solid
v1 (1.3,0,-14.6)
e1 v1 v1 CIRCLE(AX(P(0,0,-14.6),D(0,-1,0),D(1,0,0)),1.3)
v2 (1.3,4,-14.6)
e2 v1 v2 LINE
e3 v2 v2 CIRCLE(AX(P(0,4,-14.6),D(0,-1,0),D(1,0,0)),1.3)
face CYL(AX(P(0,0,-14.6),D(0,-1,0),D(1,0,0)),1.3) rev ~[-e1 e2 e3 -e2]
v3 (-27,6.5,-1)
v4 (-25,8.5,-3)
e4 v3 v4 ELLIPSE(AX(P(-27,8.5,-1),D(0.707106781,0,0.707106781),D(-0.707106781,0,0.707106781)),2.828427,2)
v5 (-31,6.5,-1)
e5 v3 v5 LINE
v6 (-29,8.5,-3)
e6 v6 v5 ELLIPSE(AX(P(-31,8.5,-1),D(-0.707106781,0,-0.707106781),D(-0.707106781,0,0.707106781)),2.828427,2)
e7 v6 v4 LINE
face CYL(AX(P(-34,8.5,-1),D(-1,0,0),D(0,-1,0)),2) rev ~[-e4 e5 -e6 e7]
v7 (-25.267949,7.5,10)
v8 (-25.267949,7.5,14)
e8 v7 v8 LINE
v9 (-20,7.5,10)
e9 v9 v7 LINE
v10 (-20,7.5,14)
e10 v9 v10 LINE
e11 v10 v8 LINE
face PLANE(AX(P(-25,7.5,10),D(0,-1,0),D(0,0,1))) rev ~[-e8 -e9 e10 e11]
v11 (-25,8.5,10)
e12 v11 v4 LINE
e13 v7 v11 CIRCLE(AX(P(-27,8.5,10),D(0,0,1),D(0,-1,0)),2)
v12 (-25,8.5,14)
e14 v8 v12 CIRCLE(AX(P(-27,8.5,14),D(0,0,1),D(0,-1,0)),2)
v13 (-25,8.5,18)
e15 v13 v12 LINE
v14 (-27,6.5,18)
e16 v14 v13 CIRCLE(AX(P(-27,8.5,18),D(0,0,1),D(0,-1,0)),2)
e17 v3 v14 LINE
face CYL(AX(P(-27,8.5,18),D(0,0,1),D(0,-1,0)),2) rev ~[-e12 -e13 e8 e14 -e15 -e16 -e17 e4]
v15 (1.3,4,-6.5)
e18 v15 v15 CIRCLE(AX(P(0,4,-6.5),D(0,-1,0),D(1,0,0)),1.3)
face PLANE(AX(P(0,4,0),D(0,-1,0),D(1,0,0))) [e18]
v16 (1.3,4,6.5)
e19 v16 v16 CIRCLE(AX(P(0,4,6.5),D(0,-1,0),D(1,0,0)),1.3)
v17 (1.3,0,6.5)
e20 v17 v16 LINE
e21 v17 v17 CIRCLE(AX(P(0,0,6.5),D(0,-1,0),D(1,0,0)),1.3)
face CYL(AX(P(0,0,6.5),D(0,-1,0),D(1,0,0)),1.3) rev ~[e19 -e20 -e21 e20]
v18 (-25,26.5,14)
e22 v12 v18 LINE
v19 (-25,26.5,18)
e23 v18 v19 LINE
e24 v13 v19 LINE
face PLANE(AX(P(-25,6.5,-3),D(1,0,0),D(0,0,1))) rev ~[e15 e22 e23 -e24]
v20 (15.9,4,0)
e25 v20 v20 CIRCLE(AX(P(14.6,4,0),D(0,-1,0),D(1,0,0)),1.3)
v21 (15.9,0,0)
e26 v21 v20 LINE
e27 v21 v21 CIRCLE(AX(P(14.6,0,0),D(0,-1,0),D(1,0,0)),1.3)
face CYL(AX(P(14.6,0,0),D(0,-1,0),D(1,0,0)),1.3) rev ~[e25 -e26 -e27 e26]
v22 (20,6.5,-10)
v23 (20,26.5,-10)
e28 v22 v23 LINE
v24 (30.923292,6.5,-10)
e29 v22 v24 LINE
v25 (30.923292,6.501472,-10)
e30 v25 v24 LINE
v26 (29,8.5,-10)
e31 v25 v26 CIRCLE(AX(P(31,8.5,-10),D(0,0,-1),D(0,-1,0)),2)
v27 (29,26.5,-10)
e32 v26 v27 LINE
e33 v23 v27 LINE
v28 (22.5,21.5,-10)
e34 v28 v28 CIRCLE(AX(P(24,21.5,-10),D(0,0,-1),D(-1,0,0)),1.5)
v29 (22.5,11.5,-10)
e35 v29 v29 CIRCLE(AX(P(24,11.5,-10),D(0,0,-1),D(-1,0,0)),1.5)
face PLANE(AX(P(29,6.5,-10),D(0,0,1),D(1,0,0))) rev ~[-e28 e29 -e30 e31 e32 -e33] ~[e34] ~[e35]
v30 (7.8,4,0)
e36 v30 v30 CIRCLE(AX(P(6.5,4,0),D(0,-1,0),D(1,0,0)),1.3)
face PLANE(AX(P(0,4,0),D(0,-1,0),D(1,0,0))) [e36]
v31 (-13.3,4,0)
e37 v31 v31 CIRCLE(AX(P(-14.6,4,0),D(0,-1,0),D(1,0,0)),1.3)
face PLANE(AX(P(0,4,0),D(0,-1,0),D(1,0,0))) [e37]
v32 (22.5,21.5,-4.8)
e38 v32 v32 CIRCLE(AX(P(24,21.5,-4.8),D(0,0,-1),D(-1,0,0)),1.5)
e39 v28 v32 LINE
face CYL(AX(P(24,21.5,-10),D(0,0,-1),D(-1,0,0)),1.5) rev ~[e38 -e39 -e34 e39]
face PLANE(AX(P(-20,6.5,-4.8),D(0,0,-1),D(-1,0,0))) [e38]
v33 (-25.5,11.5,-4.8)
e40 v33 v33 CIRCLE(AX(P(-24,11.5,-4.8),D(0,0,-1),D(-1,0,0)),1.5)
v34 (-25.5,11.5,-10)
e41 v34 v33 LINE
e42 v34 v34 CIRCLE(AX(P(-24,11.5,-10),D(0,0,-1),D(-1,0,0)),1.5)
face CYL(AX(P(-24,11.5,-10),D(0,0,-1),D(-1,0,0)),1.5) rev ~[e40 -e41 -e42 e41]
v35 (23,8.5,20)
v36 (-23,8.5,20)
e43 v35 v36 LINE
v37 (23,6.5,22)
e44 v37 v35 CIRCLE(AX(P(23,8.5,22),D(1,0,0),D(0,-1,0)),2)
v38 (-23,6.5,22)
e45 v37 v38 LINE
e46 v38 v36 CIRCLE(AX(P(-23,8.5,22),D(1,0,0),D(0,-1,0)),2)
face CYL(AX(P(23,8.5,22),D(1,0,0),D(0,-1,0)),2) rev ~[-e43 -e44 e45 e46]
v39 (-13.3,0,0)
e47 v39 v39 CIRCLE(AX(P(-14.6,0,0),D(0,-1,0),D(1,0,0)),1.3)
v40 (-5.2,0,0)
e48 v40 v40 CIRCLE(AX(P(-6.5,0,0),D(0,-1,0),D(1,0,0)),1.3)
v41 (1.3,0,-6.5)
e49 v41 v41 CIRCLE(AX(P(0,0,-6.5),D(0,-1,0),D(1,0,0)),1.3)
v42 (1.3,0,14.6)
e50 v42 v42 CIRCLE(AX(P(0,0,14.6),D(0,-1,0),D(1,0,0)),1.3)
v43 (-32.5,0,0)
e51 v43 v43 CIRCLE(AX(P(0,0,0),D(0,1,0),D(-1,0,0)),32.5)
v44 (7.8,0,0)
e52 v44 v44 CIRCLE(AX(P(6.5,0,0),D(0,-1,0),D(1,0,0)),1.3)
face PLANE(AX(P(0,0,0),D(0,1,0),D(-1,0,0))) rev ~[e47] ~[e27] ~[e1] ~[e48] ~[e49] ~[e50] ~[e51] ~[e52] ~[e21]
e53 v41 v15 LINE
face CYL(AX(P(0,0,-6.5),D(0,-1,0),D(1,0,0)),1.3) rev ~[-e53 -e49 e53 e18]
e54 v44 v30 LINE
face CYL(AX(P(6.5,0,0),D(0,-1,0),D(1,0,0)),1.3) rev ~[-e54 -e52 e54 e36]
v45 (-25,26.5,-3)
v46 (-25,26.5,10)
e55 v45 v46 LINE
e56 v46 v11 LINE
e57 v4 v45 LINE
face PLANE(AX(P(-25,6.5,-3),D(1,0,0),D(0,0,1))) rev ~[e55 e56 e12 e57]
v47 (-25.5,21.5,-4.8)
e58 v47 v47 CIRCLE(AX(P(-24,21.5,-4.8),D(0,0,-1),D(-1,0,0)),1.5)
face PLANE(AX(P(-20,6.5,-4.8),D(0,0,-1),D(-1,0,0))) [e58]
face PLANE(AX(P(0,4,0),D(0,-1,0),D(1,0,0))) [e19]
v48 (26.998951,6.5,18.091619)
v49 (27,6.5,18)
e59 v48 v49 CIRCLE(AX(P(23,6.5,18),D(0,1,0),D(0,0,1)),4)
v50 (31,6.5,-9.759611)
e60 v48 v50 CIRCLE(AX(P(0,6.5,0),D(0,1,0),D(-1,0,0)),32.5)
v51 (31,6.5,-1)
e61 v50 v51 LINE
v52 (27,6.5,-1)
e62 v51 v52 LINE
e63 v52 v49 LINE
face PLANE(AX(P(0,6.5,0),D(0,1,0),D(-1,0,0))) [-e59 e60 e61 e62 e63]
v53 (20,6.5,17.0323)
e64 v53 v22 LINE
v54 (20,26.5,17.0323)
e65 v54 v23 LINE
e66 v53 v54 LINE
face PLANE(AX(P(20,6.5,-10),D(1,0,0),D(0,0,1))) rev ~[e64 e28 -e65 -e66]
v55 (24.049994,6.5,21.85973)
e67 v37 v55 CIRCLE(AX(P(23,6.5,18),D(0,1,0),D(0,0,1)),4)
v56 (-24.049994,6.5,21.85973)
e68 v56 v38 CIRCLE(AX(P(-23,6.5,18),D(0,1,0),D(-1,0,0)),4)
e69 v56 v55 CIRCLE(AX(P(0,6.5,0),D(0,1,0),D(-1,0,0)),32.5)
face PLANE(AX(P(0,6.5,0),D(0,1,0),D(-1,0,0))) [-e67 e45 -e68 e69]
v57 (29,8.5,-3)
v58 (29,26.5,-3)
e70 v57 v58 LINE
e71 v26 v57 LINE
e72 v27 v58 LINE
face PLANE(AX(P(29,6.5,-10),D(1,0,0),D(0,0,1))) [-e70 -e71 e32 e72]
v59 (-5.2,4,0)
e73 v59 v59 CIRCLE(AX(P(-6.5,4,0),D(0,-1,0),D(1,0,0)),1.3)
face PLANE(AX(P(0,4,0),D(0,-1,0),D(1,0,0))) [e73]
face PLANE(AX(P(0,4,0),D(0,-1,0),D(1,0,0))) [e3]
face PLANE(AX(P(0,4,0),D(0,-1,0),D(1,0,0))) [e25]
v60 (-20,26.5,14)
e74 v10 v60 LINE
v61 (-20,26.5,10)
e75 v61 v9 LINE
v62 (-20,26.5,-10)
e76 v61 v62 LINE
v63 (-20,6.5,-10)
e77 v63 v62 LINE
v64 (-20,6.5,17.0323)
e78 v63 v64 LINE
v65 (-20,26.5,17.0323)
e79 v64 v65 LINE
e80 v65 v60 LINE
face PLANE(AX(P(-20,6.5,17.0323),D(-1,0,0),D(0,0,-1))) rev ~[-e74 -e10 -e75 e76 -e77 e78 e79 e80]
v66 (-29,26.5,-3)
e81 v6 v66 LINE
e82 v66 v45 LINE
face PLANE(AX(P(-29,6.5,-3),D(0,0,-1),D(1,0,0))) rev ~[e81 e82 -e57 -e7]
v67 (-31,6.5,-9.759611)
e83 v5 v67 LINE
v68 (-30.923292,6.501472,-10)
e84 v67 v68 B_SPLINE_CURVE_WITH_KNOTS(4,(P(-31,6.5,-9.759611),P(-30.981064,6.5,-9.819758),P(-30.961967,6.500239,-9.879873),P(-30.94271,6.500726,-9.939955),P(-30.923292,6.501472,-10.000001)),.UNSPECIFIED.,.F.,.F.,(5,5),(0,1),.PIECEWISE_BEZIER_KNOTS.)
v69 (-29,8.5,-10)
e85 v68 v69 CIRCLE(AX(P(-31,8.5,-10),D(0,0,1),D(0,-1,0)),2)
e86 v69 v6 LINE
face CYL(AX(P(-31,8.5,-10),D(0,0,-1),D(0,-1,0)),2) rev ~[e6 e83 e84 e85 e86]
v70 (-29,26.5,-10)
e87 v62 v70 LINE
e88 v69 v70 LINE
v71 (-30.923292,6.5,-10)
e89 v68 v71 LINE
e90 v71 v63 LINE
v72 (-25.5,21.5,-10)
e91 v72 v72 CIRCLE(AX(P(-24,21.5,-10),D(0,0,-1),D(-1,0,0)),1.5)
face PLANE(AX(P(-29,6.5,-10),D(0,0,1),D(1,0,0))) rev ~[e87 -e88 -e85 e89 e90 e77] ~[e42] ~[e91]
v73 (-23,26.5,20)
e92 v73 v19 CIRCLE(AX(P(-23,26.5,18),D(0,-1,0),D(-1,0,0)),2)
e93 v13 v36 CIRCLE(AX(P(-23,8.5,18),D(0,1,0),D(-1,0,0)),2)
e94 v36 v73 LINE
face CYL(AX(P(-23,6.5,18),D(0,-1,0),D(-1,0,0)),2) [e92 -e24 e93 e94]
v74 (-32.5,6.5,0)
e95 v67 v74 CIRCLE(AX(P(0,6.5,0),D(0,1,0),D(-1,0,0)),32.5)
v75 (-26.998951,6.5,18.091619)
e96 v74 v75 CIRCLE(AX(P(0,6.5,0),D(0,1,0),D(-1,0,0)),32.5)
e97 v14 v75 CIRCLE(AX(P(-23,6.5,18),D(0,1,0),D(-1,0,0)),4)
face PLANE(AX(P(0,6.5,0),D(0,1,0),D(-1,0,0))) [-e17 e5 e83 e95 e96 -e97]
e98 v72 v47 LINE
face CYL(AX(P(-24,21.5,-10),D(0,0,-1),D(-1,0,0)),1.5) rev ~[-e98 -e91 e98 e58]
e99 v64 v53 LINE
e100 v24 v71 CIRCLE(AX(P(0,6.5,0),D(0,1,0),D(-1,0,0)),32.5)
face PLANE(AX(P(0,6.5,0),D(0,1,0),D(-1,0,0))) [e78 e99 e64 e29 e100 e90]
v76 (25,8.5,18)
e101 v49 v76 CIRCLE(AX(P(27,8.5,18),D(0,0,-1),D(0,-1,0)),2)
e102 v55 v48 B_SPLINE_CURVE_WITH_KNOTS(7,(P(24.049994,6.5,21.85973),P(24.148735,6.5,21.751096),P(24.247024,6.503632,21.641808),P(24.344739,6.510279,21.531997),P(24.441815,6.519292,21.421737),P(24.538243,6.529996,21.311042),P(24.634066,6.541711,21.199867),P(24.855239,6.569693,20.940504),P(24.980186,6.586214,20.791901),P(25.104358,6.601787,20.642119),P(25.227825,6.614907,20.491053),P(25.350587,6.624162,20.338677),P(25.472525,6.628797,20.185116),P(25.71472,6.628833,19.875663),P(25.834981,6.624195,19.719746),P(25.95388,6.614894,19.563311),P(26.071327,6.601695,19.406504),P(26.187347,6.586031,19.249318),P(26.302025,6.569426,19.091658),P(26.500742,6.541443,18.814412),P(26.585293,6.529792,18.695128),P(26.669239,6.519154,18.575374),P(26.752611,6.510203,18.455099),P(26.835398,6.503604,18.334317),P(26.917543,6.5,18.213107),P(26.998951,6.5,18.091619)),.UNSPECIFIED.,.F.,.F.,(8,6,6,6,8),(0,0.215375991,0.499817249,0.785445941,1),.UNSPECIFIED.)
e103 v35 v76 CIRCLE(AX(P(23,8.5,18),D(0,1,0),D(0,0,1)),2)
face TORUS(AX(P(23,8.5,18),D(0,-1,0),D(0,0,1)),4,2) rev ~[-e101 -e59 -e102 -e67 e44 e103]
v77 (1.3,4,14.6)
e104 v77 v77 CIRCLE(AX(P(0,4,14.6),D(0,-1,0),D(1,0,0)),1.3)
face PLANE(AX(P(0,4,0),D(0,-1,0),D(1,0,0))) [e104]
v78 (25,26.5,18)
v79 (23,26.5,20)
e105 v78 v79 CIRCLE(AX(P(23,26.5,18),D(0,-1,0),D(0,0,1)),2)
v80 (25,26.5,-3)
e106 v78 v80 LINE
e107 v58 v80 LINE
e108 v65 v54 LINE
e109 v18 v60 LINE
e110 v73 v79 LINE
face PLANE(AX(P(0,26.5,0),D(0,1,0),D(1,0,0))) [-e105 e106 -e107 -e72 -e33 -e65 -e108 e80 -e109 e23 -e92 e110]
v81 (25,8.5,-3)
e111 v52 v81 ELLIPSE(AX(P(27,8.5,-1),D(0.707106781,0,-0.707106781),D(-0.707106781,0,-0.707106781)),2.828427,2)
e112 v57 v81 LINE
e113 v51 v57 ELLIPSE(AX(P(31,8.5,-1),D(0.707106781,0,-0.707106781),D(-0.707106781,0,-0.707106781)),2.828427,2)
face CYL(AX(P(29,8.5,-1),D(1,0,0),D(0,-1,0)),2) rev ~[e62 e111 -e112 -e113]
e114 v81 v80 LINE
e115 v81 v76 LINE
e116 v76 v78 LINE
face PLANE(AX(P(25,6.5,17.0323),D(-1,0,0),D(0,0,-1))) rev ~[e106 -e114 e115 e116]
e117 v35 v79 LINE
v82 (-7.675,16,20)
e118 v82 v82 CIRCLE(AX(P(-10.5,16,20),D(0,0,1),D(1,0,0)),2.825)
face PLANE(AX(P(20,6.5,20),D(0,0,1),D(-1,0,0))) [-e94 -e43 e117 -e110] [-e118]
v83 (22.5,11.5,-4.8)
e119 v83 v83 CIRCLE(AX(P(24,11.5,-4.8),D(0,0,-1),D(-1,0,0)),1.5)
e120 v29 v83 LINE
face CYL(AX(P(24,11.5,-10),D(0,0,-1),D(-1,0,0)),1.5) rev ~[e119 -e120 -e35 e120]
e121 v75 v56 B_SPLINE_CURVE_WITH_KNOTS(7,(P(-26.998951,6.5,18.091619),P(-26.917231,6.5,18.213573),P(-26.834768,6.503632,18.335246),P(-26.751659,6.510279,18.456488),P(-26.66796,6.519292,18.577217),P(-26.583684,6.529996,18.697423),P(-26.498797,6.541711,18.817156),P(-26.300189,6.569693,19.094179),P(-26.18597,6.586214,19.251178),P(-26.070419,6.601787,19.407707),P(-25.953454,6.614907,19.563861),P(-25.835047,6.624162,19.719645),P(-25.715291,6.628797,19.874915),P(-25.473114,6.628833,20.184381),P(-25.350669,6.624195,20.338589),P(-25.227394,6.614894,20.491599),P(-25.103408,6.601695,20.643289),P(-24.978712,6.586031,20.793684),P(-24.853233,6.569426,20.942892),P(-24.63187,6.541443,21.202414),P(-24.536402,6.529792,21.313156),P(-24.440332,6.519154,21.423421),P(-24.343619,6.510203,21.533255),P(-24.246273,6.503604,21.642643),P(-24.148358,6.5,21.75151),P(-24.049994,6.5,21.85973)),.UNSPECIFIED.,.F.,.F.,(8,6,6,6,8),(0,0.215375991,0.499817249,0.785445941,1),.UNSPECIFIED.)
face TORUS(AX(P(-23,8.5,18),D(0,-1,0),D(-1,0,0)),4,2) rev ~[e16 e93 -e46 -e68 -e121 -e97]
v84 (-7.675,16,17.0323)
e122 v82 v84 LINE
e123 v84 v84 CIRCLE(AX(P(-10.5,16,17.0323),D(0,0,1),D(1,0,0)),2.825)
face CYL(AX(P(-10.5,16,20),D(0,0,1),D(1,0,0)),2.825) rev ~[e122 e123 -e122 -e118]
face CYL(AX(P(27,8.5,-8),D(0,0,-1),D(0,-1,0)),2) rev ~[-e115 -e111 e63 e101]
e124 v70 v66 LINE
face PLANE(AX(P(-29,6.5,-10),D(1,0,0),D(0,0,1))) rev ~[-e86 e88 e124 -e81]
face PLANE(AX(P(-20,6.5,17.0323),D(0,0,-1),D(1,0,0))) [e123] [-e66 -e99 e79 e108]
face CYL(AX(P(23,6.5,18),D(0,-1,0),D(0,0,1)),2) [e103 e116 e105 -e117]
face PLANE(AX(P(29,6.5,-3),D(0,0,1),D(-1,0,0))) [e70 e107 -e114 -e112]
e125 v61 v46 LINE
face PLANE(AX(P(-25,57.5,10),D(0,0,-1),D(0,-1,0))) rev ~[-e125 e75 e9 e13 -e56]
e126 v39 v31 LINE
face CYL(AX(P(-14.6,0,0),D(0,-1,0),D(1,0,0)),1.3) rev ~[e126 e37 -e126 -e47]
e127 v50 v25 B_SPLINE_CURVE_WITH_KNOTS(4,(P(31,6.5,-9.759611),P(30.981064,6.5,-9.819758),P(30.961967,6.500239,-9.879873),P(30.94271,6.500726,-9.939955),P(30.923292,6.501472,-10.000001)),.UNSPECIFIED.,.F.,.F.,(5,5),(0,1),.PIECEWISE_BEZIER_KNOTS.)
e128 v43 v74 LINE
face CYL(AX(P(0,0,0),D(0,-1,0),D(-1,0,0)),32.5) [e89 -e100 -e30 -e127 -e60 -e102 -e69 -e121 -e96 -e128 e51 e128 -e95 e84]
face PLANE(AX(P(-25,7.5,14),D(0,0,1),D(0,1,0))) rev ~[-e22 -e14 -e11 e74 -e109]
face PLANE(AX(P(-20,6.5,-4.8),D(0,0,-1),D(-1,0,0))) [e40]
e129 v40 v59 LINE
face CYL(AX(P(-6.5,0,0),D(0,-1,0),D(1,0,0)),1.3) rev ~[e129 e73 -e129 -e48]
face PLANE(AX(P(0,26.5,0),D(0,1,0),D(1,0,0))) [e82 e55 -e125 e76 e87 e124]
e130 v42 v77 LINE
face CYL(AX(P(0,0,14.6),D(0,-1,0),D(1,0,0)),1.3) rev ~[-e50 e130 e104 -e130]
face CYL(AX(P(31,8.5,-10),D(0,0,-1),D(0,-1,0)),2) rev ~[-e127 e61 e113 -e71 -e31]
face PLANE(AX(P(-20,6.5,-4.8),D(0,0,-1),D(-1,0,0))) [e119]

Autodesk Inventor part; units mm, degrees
ref_plane "YZ Plane" through (0, 0, 0) normal (1, 0, 0) x (0, 1, 0)
ref_plane "XZ Plane" through (0, 0, 0) normal (0, 1, 0) x (-1, 0, 0)
ref_plane "XY Plane" through (0, 0, 0) normal (0, 0, 1) x (1, 0, 0)
sketch "Sketch1" plane through (0, 0, 0) normal (0, 1, 0) x (-1, 0, 0)
  line L0 (17.3205, -10) -> (21.6506, -12.5)
  line L1 (0, 0) -> (25, 0) construction
  line L2 (17.3205, 10) -> (21.6506, 12.5)
  line L3 (-17.3205, -10) -> (-21.6506, -12.5)
  line L4 (-17.3205, 10) -> (-21.6506, 12.5)
  arc A0 (17.3205, 10) -> (-17.3205, 10) centre (0, 0) ccw
  arc A1 (-17.3205, -10) -> (17.3205, -10) centre (0, 0) ccw
  arc A2 (21.6506, 12.5) -> (-21.6506, 12.5) centre (0, 0) ccw
  arc A3 (-21.6506, -12.5) -> (21.6506, -12.5) centre (0, 0) ccw
  circle A4 centre (0, 0) radius 25
  point P0 (0, -20)
  point P1 (0, -20)
  dimension "d13" = 50
  dimension "d4" = 30
  dimension "d10" = 0
  dimension "d11" = 20
sketch "Sketch2" plane through (0, 0, 0) normal (0, 1, 0) x (-1, 0, 0)
  circle A0 centre (0, 0) radius 32.5
  dimension "d14" = 65
extrude "Extrusion1" add sketch "Sketch2" along normal blind 6.5
sketch "Sketch11" plane through (0, 6.5, 0) normal (0, 1, 0) x (1, 0, 0)
  line L0 (25, 10) -> (20, 10)
  line L1 (20, 10) -> (20, -20)
  line L2 (20, -20) -> (25, -20)
  line L3 (25, -20) -> (25, 10)
  line L4 (25, -20) -> (-25, -20)
  line L5 (-25, -20) -> (-25, -17.0323)
  line L6 (-25, -17.0323) -> (25, -17.0323)
  line L7 (25, -17.0323) -> (25, -20)
  line L8 (-25, -20) -> (-20, -20)
  line L9 (-20, -20) -> (-20, 10)
  line L10 (-20, 10) -> (-25, 10)
  line L11 (-25, 10) -> (-25, -20)
  circle A0 centre (0, 0) radius 32.5 projected
  line L12 (20, 10) -> (29, 10)
  line L13 (29, 10) -> (29, 3)
  line L14 (29, 3) -> (20, 3)
  line L15 (20, 3) -> (20, 10)
  line L16 (0, 45) -> (0, 40)
  line L17 (-25, 10) -> (-20, 10)
  line L18 (-20, 10) -> (-20, -20)
  line L19 (-25, -20) -> (-25, 10)
  line L20 (-20, 10) -> (-29, 10)
  line L21 (-29, 10) -> (-29, 3)
  line L22 (-29, 3) -> (-20, 3)
  line L23 (-20, 3) -> (-20, 10)
  point P0 (0, -20)
  point P1 (20, -17.0323)
  point P2 (-20, -17.0323)
  point P3 (-25, 3)
  point P4 (25, 3)
  dimension "d79" = 30
  dimension "d80" = 50
  dimension "d81" = 5
  dimension "d82" = 5
  dimension "d83" = 30
  dimension "d85" = 25
  dimension "d86" = 25
  dimension "d87" = 20
  dimension "d90" = 9
  dimension "d91" = 7
  dimension "d92" = 9
  dimension "d118" = 40
extrude "Extrusion9" add sketch "Sketch11" along normal blind 20 contours L3 L14 L1 L0 | L12 L13 L14 L3 | L3 L6 L1 L14 | L3 L2 L1 L6 | L1 L4 L9 L6 | L9 L4 L5 L6 | L6 L11 L22 L9 | L22 L11 L10 L9 | L22 L21 L20 L11
sketch "Sketch12" plane through (-20, 6.5, -10) normal (0, 0, -1) x (-1, 0, 0)
  circle A0 centre (4, 5) radius 1.5
  line L0 (-14, -36) -> (-14, -31)
  line L1 (-14, -31) -> (-21, -31)
  circle A1 centre (4, 15) radius 1.5
  circle A2 centre (-44, 5) radius 1.5
  circle A3 centre (-44, 15) radius 1.5
  line L2 (9, 0) -> (9, 20) projected
  line L3 (12.5, 0) -> (-52.5, 0) projected
  point P0 (-20, -6.5)
  dimension "d93" = 3
  dimension "d96" = 10
  dimension "d99" = 48
  dimension "d102" = 5
  dimension "d103" = 5
extrude "Extrusion10" cut sketch "Sketch12" against normal blind 5.2
sketch "Sketch13" plane through (-25, 6.5, -3) normal (-1, 0, 0) x (0, 0, 1)
  line L0 (13, 1) -> (17, 1)
  line L1 (17, 1) -> (17, 51)
  line L2 (17, 51) -> (13, 51)
  line L3 (13, 51) -> (13, 1)
  line L4 (35.5, 0) -> (-29.5, 0) projected
  line L5 (23, 0) -> (23, 20) projected
  point P0 (3, -6.5)
  dimension "d108" = 50
  dimension "d109" = 1
  dimension "d110" = 6
  dimension "d111" = 4
extrude "Extrusion11" cut sketch "Sketch13" against normal blind 5.2
fillet "Fillet3" radius 2 9 edges at (-25, 16.5, 20) (25, 16.5, 20) (0, 6.5, 20) (25, 6.5, 8.5) (-25, 6.5, 8.5) (-29, 6.5, -6.5) (-27, 6.5, -3) (29, 6.5, -6.5) (27, 6.5, -3)
sketch "Sketch14" plane through (-23, 26.5, 20) normal (0, 0, 1) x (1, 0, 0)
  circle A0 centre (12.5, -10.5) radius 2.825
  line L0 (3, -20) -> (3, 0) projected
  line L1 (46, -18) -> (0, -18) projected
  point P0 (23, -26.5)
  dimension "d113" = 5.65
  dimension "d114" = 9.5
  dimension "d115" = 7.5
extrude "Extrusion12" cut sketch "Sketch14" against normal blind 10
sketch "Sketch15" plane through (0, 0, 0) normal (0, -1, 0) x (1, 0, 0)
  circle A0 centre (6.5, 0) radius 1.3
  circle A1 centre (14.6, 0) radius 1.3
  circle A2 centre (0, 6.5) radius 1.3
  circle A3 centre (0, 14.6) radius 1.3
  circle A4 centre (-6.5, 0) radius 1.3
  circle A5 centre (-14.6, 0) radius 1.3
  circle A6 centre (0, -6.5) radius 1.3
  circle A7 centre (0, -14.6) radius 1.3
  point P0 (0, 0)
  dimension "d119" = 2.6
  dimension "d120" = 2.6
  dimension "d121" = 6.5
  dimension "d122" = 8.1
  dimension "d125" = 360
extrude "Extrusion13" cut sketch "Sketch15" against normal blind 4
properties part number "rotacniZaklad"
